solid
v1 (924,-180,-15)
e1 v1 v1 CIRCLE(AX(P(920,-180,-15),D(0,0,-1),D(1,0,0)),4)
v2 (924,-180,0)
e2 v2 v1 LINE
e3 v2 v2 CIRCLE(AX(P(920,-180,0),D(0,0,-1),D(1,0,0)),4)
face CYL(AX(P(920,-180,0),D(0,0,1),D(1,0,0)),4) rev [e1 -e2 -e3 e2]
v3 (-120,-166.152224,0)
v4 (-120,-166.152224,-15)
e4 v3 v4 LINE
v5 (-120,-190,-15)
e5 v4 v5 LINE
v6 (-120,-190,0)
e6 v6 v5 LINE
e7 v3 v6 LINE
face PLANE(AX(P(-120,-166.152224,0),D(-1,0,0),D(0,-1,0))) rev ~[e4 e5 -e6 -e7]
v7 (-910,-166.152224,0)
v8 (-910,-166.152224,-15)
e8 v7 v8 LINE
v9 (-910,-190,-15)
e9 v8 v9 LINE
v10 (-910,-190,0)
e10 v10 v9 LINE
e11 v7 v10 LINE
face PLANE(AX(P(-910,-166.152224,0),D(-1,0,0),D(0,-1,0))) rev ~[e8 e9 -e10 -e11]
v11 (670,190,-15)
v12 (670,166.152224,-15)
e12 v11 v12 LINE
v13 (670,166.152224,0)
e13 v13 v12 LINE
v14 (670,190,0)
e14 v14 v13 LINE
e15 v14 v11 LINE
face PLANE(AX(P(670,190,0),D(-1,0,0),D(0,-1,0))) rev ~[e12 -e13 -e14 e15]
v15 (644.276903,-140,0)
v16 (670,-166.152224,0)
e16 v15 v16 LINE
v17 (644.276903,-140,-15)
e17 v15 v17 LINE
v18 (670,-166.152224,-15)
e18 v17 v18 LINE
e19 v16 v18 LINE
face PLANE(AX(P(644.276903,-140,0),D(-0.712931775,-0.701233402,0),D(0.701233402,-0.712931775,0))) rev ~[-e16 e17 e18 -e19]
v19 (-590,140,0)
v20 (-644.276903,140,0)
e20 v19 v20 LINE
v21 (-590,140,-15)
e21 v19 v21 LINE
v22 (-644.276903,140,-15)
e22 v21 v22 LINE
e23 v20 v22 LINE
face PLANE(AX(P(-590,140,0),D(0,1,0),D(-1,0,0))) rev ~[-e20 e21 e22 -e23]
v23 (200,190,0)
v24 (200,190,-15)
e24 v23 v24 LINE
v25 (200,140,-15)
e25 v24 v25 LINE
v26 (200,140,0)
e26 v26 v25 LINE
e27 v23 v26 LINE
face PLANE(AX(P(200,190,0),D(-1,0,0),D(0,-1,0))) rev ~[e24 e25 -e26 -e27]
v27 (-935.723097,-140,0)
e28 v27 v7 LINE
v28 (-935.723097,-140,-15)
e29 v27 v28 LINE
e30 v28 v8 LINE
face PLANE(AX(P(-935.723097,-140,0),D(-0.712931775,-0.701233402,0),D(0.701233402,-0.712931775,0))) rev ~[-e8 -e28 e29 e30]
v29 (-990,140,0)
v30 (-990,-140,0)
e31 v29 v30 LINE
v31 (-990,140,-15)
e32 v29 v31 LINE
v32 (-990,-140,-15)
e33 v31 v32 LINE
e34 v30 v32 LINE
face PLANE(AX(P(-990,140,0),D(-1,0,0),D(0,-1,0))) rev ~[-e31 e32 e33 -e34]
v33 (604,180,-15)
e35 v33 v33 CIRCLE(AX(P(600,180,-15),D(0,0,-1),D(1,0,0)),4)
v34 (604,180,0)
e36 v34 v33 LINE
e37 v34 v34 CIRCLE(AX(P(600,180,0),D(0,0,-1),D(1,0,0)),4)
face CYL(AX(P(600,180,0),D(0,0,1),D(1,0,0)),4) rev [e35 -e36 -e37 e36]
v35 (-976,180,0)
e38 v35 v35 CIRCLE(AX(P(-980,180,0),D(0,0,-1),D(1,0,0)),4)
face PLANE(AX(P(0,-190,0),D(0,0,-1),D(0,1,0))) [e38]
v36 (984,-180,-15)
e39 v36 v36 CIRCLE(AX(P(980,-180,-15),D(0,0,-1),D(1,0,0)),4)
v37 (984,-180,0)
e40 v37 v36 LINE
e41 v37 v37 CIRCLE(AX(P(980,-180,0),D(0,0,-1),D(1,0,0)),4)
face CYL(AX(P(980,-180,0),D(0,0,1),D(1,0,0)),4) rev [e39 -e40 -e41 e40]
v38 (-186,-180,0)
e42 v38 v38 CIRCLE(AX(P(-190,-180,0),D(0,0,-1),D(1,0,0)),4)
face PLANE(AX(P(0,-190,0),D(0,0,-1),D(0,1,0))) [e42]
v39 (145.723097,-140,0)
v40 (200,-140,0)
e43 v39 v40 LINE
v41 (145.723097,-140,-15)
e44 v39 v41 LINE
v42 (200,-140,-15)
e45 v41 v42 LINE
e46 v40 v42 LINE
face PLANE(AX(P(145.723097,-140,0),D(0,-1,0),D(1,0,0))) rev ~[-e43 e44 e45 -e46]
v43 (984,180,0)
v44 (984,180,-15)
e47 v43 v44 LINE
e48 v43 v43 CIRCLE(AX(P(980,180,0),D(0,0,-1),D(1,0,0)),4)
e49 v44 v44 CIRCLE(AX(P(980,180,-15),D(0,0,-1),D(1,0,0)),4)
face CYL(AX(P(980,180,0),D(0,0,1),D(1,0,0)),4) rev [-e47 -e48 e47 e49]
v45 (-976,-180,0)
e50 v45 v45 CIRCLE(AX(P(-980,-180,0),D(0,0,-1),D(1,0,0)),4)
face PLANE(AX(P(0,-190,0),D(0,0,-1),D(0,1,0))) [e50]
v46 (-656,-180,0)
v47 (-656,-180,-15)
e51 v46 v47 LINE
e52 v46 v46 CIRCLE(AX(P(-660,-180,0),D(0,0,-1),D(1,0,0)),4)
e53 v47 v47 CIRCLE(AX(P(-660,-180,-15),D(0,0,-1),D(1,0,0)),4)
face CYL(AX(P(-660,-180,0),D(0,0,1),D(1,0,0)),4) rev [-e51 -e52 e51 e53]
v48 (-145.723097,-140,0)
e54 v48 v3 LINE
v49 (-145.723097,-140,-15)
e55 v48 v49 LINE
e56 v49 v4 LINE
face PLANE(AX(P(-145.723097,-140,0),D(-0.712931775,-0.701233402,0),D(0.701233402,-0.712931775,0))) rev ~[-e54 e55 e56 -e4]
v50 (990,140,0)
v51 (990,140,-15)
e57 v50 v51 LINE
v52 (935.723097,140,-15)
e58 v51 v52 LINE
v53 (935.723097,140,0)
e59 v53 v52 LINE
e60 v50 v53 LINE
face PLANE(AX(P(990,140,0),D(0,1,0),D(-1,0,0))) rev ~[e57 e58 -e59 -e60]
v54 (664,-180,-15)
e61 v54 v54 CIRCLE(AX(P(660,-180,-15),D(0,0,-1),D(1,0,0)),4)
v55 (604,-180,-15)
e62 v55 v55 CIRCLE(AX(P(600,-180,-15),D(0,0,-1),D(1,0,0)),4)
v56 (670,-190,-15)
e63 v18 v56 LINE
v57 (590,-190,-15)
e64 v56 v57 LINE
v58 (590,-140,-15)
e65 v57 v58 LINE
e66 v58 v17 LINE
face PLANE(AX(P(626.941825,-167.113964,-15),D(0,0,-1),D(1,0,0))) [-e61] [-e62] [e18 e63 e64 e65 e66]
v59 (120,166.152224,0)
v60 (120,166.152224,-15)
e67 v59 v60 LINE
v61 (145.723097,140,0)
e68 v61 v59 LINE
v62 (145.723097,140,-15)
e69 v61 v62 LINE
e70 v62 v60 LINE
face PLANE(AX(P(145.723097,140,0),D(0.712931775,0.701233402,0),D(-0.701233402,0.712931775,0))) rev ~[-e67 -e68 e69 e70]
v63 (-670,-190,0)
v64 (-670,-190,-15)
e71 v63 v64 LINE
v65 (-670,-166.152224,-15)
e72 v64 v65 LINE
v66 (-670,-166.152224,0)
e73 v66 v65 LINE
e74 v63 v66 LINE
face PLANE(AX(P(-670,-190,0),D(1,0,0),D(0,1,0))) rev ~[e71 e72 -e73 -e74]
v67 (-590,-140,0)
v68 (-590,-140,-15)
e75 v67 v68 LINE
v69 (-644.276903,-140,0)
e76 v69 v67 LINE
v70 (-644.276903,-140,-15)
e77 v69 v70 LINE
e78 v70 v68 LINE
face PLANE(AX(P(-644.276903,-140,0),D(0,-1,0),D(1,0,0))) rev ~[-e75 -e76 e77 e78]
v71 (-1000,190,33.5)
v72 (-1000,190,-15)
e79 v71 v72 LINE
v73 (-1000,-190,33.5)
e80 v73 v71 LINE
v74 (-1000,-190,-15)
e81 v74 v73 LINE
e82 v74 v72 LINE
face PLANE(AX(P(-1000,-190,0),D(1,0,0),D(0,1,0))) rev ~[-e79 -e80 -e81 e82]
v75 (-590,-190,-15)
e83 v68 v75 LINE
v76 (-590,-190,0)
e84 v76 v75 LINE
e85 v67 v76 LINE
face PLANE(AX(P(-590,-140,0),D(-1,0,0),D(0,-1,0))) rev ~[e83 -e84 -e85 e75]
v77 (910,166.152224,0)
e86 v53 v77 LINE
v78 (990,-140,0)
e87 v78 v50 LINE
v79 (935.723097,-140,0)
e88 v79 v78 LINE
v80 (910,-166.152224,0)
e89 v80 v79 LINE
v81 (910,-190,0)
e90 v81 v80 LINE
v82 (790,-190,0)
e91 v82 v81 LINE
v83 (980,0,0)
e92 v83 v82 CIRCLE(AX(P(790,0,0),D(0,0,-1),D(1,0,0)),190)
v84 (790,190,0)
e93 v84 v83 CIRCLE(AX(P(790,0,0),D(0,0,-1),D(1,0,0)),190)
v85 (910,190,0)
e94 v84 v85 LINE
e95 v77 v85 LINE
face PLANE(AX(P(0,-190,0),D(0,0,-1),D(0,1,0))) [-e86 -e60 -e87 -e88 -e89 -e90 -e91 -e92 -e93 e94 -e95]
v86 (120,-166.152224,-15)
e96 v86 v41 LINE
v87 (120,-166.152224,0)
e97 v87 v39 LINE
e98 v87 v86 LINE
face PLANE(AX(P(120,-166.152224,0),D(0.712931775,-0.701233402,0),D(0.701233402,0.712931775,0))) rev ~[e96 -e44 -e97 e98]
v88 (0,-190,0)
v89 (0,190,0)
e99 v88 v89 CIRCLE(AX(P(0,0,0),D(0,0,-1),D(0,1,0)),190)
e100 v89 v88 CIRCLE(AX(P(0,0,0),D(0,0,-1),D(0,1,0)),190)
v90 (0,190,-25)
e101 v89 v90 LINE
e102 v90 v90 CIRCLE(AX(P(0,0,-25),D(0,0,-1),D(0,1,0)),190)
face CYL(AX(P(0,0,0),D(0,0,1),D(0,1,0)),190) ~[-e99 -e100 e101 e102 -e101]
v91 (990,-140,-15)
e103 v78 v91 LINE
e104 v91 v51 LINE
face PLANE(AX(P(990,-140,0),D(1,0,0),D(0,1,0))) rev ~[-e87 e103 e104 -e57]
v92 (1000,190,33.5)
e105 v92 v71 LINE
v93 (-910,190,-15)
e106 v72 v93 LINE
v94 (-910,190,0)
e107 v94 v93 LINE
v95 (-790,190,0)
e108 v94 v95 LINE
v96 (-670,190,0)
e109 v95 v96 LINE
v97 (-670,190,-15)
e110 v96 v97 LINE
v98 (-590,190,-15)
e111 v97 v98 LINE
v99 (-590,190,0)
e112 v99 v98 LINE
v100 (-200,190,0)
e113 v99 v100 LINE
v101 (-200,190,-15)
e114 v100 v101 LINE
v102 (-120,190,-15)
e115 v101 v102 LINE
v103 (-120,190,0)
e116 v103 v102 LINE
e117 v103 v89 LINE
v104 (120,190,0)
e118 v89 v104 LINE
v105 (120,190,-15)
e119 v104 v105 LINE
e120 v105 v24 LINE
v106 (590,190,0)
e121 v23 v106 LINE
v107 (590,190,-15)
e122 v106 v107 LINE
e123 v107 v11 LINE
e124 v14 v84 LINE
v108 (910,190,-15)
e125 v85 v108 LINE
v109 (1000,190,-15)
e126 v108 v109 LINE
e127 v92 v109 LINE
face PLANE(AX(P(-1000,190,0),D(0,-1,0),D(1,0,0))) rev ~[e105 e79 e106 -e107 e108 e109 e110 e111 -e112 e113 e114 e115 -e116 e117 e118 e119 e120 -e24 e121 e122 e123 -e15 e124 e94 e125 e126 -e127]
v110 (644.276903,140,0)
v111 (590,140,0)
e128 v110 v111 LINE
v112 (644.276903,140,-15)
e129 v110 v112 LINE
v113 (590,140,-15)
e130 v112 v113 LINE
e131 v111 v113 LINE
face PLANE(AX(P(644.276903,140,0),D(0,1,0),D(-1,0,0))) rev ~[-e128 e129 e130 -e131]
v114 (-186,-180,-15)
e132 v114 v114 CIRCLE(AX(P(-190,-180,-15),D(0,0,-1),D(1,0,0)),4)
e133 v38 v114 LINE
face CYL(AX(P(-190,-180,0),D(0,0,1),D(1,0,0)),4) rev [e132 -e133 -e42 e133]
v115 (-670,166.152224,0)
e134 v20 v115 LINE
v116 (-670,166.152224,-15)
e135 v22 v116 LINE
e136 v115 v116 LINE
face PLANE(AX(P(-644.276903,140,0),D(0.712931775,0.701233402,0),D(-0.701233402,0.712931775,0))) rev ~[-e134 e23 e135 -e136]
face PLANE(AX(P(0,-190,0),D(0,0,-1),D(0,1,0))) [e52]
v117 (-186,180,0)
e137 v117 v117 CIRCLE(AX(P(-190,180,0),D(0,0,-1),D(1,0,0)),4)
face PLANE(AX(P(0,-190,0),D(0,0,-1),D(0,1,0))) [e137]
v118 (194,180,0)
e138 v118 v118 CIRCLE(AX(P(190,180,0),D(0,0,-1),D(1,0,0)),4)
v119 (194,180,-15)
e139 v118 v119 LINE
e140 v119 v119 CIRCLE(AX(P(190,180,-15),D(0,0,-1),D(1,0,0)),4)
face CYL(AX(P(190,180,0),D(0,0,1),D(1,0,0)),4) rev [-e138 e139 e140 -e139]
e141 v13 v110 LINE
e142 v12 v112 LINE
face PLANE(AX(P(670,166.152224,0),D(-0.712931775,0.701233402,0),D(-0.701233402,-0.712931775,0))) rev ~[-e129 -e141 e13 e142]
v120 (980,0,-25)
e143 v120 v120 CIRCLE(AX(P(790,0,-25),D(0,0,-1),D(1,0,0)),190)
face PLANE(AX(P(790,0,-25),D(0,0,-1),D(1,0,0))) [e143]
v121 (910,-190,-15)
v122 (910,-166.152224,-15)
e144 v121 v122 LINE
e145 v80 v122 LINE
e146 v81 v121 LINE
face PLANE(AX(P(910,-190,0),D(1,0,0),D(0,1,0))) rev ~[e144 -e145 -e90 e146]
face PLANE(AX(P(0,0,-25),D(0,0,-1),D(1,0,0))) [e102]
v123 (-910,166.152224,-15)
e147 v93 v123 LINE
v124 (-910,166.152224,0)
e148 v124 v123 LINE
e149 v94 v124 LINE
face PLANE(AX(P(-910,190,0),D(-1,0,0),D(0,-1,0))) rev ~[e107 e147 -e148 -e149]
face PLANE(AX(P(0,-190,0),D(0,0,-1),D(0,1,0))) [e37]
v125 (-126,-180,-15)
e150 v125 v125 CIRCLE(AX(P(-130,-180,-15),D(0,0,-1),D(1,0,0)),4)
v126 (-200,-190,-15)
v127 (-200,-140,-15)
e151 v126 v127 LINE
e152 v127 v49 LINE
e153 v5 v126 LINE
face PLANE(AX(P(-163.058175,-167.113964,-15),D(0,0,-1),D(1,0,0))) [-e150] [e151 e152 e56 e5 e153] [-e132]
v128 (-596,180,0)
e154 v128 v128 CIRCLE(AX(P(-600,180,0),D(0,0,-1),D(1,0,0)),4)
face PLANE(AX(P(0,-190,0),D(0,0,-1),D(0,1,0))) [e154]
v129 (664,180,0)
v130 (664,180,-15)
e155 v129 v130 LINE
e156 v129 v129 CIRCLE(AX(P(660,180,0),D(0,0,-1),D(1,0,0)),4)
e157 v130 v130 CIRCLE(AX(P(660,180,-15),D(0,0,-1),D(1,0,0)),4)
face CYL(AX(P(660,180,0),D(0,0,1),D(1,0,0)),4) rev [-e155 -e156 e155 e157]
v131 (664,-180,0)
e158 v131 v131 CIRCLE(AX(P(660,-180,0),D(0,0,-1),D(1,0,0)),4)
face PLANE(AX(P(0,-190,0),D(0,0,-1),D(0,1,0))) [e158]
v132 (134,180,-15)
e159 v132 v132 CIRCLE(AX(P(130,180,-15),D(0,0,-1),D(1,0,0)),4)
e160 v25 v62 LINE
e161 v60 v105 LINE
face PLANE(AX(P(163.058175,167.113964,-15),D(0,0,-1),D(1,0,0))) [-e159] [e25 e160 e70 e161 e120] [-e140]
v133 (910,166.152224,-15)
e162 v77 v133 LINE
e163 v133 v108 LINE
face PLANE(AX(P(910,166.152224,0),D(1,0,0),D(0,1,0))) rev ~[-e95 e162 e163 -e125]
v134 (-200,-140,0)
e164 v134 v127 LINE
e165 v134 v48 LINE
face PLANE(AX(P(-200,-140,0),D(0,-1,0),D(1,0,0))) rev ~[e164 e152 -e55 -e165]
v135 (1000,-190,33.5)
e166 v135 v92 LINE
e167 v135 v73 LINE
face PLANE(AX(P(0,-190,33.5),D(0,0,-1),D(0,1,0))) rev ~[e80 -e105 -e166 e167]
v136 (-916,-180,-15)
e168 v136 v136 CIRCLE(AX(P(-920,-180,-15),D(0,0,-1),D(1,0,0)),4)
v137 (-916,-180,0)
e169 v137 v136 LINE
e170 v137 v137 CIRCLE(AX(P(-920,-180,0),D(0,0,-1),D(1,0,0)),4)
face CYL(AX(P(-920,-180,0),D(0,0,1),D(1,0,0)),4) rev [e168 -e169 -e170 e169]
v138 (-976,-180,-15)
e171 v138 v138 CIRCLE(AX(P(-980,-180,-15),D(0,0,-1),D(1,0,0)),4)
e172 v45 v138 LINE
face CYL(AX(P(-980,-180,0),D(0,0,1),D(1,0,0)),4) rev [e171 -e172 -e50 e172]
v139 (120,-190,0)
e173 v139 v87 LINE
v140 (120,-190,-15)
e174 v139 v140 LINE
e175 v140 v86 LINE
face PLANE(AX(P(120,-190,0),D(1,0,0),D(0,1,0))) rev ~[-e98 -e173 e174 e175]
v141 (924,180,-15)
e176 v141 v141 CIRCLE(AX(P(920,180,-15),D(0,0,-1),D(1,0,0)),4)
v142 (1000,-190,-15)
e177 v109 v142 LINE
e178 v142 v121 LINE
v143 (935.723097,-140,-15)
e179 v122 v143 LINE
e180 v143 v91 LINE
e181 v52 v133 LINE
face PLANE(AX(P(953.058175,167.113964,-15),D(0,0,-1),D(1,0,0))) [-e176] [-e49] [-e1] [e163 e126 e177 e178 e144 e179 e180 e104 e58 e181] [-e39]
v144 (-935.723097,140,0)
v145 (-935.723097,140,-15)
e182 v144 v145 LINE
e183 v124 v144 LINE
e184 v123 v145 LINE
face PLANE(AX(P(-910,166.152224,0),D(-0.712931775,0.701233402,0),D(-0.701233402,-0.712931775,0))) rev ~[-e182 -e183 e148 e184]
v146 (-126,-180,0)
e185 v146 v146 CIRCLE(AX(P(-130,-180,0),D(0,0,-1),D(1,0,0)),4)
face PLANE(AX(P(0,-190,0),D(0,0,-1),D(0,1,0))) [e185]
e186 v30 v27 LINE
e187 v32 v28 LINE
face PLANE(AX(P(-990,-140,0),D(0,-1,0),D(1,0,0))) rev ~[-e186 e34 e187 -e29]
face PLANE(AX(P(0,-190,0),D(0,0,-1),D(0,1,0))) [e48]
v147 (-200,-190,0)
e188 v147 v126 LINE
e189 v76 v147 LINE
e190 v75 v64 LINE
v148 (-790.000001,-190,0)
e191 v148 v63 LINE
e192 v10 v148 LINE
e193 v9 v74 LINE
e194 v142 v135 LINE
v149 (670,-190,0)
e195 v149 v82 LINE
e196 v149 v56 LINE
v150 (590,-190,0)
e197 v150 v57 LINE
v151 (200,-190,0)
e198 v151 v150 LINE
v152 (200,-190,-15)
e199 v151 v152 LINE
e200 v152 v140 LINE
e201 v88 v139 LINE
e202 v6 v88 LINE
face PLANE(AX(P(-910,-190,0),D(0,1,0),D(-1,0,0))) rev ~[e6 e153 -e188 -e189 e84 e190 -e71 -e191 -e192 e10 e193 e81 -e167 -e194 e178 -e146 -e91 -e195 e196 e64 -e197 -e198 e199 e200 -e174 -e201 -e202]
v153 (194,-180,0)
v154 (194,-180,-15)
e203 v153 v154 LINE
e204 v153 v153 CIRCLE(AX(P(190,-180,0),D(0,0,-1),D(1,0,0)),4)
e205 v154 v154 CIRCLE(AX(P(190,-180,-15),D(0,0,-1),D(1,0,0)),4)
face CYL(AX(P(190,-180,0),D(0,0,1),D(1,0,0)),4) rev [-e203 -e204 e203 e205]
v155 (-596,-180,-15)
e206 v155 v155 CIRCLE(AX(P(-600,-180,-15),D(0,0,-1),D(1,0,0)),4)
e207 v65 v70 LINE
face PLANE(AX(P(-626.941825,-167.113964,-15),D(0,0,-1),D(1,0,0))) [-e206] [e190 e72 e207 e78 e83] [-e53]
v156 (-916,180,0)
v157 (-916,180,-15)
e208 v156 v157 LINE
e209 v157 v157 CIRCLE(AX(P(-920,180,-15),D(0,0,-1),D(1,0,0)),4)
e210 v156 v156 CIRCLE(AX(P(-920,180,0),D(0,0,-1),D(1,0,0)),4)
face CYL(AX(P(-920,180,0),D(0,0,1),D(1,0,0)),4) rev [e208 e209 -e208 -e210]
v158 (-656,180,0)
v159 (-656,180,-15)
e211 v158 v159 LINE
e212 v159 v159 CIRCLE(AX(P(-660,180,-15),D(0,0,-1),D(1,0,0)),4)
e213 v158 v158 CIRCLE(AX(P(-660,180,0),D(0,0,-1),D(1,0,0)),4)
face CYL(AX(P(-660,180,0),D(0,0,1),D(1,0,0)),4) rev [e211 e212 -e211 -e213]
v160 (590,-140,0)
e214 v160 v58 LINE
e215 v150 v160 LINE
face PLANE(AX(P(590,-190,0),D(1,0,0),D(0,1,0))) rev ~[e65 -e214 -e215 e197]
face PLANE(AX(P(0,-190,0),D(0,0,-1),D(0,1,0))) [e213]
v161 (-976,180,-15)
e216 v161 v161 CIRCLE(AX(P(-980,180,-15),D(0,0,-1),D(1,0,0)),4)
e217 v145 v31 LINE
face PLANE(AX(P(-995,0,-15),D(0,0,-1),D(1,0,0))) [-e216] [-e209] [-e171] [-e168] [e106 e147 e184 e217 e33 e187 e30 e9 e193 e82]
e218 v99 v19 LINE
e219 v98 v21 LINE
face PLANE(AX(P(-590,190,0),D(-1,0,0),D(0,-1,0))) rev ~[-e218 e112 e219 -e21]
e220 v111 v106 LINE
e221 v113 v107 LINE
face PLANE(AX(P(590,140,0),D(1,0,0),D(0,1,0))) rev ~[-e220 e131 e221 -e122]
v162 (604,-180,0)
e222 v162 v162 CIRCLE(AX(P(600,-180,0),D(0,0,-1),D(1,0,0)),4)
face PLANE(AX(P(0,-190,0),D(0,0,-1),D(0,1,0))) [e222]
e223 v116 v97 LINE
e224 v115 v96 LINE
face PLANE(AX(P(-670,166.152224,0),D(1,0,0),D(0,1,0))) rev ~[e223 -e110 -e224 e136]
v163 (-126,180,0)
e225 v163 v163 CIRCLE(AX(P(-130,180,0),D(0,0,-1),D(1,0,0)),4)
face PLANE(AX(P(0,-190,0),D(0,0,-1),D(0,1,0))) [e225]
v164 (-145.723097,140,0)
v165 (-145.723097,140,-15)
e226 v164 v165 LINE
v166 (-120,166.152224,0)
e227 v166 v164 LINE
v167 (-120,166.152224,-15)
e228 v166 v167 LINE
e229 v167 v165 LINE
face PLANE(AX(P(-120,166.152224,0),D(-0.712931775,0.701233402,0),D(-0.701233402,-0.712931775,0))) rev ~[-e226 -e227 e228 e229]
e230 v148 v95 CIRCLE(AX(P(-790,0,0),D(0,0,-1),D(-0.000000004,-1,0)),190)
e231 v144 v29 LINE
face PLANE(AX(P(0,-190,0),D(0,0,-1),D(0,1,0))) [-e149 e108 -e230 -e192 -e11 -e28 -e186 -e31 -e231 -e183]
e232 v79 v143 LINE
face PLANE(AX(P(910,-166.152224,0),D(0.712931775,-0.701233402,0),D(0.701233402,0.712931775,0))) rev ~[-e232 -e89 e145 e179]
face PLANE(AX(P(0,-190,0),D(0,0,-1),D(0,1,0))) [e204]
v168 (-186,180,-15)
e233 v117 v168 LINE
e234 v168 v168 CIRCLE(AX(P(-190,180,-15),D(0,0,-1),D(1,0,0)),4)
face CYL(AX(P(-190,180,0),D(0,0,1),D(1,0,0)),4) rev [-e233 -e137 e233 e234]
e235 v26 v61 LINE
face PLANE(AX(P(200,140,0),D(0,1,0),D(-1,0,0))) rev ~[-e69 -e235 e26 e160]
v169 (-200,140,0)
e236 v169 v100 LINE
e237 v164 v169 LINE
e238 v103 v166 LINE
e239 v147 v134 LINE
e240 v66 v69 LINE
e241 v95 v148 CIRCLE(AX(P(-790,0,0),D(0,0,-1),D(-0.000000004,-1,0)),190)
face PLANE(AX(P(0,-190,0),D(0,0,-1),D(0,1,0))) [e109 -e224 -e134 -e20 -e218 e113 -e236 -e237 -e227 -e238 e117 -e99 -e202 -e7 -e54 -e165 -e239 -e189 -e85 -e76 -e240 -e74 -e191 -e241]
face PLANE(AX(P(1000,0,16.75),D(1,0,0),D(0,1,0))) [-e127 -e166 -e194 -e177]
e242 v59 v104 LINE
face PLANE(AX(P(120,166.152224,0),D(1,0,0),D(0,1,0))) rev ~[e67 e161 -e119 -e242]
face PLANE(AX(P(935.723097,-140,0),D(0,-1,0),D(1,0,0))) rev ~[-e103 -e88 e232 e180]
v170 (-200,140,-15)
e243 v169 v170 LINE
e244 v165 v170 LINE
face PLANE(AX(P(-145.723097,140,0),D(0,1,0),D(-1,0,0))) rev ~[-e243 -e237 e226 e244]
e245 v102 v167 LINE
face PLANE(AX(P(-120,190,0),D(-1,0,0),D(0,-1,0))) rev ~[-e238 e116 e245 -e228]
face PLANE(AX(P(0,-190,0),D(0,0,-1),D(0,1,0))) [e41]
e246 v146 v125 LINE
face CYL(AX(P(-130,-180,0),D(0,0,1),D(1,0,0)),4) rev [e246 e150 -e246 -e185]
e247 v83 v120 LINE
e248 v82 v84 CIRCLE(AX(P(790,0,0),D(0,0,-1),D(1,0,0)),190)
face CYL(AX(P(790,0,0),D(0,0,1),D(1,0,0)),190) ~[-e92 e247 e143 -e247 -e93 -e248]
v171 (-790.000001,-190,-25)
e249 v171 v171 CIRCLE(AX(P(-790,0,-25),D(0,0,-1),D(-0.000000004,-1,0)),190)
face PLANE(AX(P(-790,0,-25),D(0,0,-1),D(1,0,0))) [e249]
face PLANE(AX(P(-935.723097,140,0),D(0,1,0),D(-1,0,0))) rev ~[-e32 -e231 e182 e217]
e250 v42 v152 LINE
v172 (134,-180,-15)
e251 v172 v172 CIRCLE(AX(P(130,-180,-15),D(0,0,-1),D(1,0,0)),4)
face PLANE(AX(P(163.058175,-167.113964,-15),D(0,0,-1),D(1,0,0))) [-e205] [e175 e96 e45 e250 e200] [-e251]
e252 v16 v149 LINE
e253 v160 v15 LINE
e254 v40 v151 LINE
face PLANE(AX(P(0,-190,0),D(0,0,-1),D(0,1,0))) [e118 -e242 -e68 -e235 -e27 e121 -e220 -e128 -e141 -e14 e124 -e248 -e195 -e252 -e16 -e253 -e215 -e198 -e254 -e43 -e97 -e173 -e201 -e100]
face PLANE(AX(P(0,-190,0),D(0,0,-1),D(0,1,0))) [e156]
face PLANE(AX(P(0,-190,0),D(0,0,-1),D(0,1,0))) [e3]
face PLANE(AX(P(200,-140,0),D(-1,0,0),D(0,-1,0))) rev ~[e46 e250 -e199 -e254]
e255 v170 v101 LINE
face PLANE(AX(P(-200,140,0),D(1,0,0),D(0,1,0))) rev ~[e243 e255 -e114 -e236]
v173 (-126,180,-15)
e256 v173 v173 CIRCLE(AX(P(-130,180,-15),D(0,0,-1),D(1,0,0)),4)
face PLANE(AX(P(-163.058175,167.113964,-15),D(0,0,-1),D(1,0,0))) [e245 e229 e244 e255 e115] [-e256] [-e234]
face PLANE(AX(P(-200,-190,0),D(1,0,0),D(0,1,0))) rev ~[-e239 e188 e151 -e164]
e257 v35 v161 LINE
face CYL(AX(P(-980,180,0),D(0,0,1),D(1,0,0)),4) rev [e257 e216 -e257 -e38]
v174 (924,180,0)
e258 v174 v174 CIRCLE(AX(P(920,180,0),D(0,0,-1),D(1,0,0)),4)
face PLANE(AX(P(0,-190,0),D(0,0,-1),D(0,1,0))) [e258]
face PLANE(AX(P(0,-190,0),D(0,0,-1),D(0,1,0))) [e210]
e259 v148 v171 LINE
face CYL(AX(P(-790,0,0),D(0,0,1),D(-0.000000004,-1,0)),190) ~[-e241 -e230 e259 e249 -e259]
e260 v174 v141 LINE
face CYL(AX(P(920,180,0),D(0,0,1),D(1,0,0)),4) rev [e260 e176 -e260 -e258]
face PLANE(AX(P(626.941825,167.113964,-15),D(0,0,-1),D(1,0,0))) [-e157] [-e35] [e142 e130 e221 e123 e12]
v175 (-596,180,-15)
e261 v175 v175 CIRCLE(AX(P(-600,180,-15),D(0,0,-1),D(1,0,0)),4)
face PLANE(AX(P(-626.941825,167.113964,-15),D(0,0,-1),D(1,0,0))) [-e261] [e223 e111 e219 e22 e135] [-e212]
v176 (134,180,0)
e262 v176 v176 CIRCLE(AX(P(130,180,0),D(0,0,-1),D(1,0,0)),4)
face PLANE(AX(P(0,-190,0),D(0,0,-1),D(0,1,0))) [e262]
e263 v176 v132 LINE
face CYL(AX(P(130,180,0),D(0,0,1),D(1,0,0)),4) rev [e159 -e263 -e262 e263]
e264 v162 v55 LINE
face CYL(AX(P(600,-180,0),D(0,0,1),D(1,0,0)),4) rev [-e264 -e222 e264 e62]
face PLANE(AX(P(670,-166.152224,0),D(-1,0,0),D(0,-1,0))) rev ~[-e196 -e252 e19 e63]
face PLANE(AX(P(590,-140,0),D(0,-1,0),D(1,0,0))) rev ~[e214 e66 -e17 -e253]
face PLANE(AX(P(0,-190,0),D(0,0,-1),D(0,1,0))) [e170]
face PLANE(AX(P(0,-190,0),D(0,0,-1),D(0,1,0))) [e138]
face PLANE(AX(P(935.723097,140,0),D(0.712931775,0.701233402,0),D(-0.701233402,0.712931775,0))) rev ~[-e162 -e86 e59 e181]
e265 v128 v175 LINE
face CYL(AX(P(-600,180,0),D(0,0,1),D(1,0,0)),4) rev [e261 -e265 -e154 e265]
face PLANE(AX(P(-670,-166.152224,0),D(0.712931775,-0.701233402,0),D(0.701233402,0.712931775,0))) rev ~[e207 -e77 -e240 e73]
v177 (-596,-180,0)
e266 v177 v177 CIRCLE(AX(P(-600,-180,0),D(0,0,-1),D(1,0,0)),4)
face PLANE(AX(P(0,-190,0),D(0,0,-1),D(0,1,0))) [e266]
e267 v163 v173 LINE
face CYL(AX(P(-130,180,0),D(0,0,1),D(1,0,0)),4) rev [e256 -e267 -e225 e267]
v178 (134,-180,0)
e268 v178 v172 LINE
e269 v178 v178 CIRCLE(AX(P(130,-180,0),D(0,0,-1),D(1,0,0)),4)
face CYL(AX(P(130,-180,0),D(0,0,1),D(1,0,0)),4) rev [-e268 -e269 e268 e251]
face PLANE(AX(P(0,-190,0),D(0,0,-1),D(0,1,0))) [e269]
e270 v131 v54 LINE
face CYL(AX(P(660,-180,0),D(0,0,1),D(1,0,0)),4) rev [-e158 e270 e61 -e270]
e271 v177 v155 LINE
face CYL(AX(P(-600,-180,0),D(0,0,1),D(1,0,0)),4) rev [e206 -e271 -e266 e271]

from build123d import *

# Parameters (mm, degrees)
F0_W     = 380
F0_H     = 33.5
F1_DEPTH = 1000
F3_DEPTH = 25
F4_R     = 4
F5_DEPTH = 15


# Not quite as in the source:
# - a feature names something its author has since deleted; it is built from what else it names


with BuildPart() as f1:
    # F0 (on Right) → F1 (new body, symmetric)
    with BuildSketch(Plane.YZ):
        with Locations((0, 16.75)):
            Rectangle(F0_W, F0_H)
    extrude(amount=F1_DEPTH, both=True)

    # F2 (on face) → F3 (join)
    with BuildSketch(Plane(origin=(0, 0, 0), x_dir=(1, 0, 0), z_dir=(0, 0, -1))):
        with BuildLine():
            ThreePointArc((-790, -190), (-655.6497115746, -134.3502884254), (-600, 0))
            ThreePointArc((-600, 0), (-655.6497118153, 134.3502886662), (-790.0000006809, 190))
            ThreePointArc((-790.0000006809, 190), (-980, -3.405e-07), (-790, -190))
        make_face()
        with BuildLine():
            ThreePointArc((190, 0), (134.350288533, 134.3502883179), (3.042e-07, 190))
            ThreePointArc((3.042e-07, 190), (-190, 1.521e-07), (0, -190))
            ThreePointArc((0, -190), (134.3502884254, -134.3502884254), (190, 0))
        make_face()
        with BuildLine():
            ThreePointArc((980, 0), (924.3502884254, 134.3502884254), (790, 190))
            ThreePointArc((790, 190), (600, 0), (790, -190))
            ThreePointArc((790, -190), (924.3502884254, -134.3502884254), (980, 0))
        make_face()
    extrude(amount=F3_DEPTH)

    # F4 (on face) → F5 (join)
    with BuildSketch(Plane(origin=(0, 0, 0), x_dir=(1, 0, 0), z_dir=(0, 0, -1))):
        Polygon((-990, 190), (-1000, 190), (-1000, 70), (-1000, -190), (-990, -190), (-990, -140), (-990, 140), align=None)
        Polygon((-910, 190), (-990, 190), (-990, 140), (-935.7230966807, 140), (-910, 166.1522239447), align=None)
        with Locations((-980, 180)):
            Circle(F4_R, mode=Mode.SUBTRACT)
        with Locations((-920, 180)):
            Circle(F4_R, mode=Mode.SUBTRACT)
        Polygon((-990, -140), (-990, -190), (-910, -190), (-910, -166.1522239447), (-935.7230966807, -140), align=None)
        with Locations((-980, -180)):
            Circle(F4_R, mode=Mode.SUBTRACT)
        with Locations((-920, -180)):
            Circle(F4_R, mode=Mode.SUBTRACT)
        Polygon((-590, 190), (-670, 190), (-670, 166.1522239447), (-644.2769033193, 140), (-590, 140), align=None)
        with Locations((-660, 180)):
            Circle(F4_R, mode=Mode.SUBTRACT)
        with Locations((-600, 180)):
            Circle(F4_R, mode=Mode.SUBTRACT)
        Polygon((-670, -166.1522239447), (-670, -190), (-590, -190), (-590, -140), (-644.2769033193, -140), align=None)
        with Locations((-660, -180)):
            Circle(F4_R, mode=Mode.SUBTRACT)
        with Locations((-600, -180)):
            Circle(F4_R, mode=Mode.SUBTRACT)
        Polygon((-120, 190), (-200, 190), (-200, 140), (-145.7230966807, 140), (-120, 166.1522239447), align=None)
        with Locations((-190, 180)):
            Circle(F4_R, mode=Mode.SUBTRACT)
        with Locations((-130, 180)):
            Circle(F4_R, mode=Mode.SUBTRACT)
        Polygon((-200, -140), (-200, -190), (-120, -190), (-120, -166.1522239447), (-145.7230966807, -140), align=None)
        with Locations((-190, -180)):
            Circle(F4_R, mode=Mode.SUBTRACT)
        with Locations((-130, -180)):
            Circle(F4_R, mode=Mode.SUBTRACT)
        Polygon((200, 190), (120, 190), (120, 166.1522239447), (145.7230966807, 140), (200, 140), align=None)
        with Locations((130, 180)):
            Circle(F4_R, mode=Mode.SUBTRACT)
        with Locations((190, 180)):
            Circle(F4_R, mode=Mode.SUBTRACT)
        Polygon((120, -166.1522239447), (120, -190), (200, -190), (200, -140), (145.7230966807, -140), align=None)
        with Locations((130, -180)):
            Circle(F4_R, mode=Mode.SUBTRACT)
        with Locations((190, -180)):
            Circle(F4_R, mode=Mode.SUBTRACT)
        Polygon((590, -140), (590, -190), (670, -190), (670, -166.1522239447), (644.2769033193, -140), align=None)
        with Locations((600, -180)):
            Circle(F4_R, mode=Mode.SUBTRACT)
        with Locations((660, -180)):
            Circle(F4_R, mode=Mode.SUBTRACT)
        Polygon((670, 190), (590, 190), (590, 140), (644.2769033193, 140), (670, 166.1522239447), align=None)
        with Locations((600, 180)):
            Circle(F4_R, mode=Mode.SUBTRACT)
        with Locations((660, 180)):
            Circle(F4_R, mode=Mode.SUBTRACT)
        Polygon((910, -166.1522239447), (910, -190), (990, -190), (990, -140), (935.7230966807, -140), align=None)
        with Locations((920, -180)):
            Circle(F4_R, mode=Mode.SUBTRACT)
        with Locations((980, -180)):
            Circle(F4_R, mode=Mode.SUBTRACT)
        Polygon((990, 190), (910, 190), (910, 166.1522239447), (935.7230966807, 140), (990, 140), align=None)
        with Locations((920, 180)):
            Circle(F4_R, mode=Mode.SUBTRACT)
        with Locations((980, 180)):
            Circle(F4_R, mode=Mode.SUBTRACT)
        Polygon((990, -140), (990, -190), (1000, -190), (1000, -70), (1000, 70), (1000, 190), (990, 190), (990, 140), align=None)
    extrude(amount=F5_DEPTH)


solid = f1.part
